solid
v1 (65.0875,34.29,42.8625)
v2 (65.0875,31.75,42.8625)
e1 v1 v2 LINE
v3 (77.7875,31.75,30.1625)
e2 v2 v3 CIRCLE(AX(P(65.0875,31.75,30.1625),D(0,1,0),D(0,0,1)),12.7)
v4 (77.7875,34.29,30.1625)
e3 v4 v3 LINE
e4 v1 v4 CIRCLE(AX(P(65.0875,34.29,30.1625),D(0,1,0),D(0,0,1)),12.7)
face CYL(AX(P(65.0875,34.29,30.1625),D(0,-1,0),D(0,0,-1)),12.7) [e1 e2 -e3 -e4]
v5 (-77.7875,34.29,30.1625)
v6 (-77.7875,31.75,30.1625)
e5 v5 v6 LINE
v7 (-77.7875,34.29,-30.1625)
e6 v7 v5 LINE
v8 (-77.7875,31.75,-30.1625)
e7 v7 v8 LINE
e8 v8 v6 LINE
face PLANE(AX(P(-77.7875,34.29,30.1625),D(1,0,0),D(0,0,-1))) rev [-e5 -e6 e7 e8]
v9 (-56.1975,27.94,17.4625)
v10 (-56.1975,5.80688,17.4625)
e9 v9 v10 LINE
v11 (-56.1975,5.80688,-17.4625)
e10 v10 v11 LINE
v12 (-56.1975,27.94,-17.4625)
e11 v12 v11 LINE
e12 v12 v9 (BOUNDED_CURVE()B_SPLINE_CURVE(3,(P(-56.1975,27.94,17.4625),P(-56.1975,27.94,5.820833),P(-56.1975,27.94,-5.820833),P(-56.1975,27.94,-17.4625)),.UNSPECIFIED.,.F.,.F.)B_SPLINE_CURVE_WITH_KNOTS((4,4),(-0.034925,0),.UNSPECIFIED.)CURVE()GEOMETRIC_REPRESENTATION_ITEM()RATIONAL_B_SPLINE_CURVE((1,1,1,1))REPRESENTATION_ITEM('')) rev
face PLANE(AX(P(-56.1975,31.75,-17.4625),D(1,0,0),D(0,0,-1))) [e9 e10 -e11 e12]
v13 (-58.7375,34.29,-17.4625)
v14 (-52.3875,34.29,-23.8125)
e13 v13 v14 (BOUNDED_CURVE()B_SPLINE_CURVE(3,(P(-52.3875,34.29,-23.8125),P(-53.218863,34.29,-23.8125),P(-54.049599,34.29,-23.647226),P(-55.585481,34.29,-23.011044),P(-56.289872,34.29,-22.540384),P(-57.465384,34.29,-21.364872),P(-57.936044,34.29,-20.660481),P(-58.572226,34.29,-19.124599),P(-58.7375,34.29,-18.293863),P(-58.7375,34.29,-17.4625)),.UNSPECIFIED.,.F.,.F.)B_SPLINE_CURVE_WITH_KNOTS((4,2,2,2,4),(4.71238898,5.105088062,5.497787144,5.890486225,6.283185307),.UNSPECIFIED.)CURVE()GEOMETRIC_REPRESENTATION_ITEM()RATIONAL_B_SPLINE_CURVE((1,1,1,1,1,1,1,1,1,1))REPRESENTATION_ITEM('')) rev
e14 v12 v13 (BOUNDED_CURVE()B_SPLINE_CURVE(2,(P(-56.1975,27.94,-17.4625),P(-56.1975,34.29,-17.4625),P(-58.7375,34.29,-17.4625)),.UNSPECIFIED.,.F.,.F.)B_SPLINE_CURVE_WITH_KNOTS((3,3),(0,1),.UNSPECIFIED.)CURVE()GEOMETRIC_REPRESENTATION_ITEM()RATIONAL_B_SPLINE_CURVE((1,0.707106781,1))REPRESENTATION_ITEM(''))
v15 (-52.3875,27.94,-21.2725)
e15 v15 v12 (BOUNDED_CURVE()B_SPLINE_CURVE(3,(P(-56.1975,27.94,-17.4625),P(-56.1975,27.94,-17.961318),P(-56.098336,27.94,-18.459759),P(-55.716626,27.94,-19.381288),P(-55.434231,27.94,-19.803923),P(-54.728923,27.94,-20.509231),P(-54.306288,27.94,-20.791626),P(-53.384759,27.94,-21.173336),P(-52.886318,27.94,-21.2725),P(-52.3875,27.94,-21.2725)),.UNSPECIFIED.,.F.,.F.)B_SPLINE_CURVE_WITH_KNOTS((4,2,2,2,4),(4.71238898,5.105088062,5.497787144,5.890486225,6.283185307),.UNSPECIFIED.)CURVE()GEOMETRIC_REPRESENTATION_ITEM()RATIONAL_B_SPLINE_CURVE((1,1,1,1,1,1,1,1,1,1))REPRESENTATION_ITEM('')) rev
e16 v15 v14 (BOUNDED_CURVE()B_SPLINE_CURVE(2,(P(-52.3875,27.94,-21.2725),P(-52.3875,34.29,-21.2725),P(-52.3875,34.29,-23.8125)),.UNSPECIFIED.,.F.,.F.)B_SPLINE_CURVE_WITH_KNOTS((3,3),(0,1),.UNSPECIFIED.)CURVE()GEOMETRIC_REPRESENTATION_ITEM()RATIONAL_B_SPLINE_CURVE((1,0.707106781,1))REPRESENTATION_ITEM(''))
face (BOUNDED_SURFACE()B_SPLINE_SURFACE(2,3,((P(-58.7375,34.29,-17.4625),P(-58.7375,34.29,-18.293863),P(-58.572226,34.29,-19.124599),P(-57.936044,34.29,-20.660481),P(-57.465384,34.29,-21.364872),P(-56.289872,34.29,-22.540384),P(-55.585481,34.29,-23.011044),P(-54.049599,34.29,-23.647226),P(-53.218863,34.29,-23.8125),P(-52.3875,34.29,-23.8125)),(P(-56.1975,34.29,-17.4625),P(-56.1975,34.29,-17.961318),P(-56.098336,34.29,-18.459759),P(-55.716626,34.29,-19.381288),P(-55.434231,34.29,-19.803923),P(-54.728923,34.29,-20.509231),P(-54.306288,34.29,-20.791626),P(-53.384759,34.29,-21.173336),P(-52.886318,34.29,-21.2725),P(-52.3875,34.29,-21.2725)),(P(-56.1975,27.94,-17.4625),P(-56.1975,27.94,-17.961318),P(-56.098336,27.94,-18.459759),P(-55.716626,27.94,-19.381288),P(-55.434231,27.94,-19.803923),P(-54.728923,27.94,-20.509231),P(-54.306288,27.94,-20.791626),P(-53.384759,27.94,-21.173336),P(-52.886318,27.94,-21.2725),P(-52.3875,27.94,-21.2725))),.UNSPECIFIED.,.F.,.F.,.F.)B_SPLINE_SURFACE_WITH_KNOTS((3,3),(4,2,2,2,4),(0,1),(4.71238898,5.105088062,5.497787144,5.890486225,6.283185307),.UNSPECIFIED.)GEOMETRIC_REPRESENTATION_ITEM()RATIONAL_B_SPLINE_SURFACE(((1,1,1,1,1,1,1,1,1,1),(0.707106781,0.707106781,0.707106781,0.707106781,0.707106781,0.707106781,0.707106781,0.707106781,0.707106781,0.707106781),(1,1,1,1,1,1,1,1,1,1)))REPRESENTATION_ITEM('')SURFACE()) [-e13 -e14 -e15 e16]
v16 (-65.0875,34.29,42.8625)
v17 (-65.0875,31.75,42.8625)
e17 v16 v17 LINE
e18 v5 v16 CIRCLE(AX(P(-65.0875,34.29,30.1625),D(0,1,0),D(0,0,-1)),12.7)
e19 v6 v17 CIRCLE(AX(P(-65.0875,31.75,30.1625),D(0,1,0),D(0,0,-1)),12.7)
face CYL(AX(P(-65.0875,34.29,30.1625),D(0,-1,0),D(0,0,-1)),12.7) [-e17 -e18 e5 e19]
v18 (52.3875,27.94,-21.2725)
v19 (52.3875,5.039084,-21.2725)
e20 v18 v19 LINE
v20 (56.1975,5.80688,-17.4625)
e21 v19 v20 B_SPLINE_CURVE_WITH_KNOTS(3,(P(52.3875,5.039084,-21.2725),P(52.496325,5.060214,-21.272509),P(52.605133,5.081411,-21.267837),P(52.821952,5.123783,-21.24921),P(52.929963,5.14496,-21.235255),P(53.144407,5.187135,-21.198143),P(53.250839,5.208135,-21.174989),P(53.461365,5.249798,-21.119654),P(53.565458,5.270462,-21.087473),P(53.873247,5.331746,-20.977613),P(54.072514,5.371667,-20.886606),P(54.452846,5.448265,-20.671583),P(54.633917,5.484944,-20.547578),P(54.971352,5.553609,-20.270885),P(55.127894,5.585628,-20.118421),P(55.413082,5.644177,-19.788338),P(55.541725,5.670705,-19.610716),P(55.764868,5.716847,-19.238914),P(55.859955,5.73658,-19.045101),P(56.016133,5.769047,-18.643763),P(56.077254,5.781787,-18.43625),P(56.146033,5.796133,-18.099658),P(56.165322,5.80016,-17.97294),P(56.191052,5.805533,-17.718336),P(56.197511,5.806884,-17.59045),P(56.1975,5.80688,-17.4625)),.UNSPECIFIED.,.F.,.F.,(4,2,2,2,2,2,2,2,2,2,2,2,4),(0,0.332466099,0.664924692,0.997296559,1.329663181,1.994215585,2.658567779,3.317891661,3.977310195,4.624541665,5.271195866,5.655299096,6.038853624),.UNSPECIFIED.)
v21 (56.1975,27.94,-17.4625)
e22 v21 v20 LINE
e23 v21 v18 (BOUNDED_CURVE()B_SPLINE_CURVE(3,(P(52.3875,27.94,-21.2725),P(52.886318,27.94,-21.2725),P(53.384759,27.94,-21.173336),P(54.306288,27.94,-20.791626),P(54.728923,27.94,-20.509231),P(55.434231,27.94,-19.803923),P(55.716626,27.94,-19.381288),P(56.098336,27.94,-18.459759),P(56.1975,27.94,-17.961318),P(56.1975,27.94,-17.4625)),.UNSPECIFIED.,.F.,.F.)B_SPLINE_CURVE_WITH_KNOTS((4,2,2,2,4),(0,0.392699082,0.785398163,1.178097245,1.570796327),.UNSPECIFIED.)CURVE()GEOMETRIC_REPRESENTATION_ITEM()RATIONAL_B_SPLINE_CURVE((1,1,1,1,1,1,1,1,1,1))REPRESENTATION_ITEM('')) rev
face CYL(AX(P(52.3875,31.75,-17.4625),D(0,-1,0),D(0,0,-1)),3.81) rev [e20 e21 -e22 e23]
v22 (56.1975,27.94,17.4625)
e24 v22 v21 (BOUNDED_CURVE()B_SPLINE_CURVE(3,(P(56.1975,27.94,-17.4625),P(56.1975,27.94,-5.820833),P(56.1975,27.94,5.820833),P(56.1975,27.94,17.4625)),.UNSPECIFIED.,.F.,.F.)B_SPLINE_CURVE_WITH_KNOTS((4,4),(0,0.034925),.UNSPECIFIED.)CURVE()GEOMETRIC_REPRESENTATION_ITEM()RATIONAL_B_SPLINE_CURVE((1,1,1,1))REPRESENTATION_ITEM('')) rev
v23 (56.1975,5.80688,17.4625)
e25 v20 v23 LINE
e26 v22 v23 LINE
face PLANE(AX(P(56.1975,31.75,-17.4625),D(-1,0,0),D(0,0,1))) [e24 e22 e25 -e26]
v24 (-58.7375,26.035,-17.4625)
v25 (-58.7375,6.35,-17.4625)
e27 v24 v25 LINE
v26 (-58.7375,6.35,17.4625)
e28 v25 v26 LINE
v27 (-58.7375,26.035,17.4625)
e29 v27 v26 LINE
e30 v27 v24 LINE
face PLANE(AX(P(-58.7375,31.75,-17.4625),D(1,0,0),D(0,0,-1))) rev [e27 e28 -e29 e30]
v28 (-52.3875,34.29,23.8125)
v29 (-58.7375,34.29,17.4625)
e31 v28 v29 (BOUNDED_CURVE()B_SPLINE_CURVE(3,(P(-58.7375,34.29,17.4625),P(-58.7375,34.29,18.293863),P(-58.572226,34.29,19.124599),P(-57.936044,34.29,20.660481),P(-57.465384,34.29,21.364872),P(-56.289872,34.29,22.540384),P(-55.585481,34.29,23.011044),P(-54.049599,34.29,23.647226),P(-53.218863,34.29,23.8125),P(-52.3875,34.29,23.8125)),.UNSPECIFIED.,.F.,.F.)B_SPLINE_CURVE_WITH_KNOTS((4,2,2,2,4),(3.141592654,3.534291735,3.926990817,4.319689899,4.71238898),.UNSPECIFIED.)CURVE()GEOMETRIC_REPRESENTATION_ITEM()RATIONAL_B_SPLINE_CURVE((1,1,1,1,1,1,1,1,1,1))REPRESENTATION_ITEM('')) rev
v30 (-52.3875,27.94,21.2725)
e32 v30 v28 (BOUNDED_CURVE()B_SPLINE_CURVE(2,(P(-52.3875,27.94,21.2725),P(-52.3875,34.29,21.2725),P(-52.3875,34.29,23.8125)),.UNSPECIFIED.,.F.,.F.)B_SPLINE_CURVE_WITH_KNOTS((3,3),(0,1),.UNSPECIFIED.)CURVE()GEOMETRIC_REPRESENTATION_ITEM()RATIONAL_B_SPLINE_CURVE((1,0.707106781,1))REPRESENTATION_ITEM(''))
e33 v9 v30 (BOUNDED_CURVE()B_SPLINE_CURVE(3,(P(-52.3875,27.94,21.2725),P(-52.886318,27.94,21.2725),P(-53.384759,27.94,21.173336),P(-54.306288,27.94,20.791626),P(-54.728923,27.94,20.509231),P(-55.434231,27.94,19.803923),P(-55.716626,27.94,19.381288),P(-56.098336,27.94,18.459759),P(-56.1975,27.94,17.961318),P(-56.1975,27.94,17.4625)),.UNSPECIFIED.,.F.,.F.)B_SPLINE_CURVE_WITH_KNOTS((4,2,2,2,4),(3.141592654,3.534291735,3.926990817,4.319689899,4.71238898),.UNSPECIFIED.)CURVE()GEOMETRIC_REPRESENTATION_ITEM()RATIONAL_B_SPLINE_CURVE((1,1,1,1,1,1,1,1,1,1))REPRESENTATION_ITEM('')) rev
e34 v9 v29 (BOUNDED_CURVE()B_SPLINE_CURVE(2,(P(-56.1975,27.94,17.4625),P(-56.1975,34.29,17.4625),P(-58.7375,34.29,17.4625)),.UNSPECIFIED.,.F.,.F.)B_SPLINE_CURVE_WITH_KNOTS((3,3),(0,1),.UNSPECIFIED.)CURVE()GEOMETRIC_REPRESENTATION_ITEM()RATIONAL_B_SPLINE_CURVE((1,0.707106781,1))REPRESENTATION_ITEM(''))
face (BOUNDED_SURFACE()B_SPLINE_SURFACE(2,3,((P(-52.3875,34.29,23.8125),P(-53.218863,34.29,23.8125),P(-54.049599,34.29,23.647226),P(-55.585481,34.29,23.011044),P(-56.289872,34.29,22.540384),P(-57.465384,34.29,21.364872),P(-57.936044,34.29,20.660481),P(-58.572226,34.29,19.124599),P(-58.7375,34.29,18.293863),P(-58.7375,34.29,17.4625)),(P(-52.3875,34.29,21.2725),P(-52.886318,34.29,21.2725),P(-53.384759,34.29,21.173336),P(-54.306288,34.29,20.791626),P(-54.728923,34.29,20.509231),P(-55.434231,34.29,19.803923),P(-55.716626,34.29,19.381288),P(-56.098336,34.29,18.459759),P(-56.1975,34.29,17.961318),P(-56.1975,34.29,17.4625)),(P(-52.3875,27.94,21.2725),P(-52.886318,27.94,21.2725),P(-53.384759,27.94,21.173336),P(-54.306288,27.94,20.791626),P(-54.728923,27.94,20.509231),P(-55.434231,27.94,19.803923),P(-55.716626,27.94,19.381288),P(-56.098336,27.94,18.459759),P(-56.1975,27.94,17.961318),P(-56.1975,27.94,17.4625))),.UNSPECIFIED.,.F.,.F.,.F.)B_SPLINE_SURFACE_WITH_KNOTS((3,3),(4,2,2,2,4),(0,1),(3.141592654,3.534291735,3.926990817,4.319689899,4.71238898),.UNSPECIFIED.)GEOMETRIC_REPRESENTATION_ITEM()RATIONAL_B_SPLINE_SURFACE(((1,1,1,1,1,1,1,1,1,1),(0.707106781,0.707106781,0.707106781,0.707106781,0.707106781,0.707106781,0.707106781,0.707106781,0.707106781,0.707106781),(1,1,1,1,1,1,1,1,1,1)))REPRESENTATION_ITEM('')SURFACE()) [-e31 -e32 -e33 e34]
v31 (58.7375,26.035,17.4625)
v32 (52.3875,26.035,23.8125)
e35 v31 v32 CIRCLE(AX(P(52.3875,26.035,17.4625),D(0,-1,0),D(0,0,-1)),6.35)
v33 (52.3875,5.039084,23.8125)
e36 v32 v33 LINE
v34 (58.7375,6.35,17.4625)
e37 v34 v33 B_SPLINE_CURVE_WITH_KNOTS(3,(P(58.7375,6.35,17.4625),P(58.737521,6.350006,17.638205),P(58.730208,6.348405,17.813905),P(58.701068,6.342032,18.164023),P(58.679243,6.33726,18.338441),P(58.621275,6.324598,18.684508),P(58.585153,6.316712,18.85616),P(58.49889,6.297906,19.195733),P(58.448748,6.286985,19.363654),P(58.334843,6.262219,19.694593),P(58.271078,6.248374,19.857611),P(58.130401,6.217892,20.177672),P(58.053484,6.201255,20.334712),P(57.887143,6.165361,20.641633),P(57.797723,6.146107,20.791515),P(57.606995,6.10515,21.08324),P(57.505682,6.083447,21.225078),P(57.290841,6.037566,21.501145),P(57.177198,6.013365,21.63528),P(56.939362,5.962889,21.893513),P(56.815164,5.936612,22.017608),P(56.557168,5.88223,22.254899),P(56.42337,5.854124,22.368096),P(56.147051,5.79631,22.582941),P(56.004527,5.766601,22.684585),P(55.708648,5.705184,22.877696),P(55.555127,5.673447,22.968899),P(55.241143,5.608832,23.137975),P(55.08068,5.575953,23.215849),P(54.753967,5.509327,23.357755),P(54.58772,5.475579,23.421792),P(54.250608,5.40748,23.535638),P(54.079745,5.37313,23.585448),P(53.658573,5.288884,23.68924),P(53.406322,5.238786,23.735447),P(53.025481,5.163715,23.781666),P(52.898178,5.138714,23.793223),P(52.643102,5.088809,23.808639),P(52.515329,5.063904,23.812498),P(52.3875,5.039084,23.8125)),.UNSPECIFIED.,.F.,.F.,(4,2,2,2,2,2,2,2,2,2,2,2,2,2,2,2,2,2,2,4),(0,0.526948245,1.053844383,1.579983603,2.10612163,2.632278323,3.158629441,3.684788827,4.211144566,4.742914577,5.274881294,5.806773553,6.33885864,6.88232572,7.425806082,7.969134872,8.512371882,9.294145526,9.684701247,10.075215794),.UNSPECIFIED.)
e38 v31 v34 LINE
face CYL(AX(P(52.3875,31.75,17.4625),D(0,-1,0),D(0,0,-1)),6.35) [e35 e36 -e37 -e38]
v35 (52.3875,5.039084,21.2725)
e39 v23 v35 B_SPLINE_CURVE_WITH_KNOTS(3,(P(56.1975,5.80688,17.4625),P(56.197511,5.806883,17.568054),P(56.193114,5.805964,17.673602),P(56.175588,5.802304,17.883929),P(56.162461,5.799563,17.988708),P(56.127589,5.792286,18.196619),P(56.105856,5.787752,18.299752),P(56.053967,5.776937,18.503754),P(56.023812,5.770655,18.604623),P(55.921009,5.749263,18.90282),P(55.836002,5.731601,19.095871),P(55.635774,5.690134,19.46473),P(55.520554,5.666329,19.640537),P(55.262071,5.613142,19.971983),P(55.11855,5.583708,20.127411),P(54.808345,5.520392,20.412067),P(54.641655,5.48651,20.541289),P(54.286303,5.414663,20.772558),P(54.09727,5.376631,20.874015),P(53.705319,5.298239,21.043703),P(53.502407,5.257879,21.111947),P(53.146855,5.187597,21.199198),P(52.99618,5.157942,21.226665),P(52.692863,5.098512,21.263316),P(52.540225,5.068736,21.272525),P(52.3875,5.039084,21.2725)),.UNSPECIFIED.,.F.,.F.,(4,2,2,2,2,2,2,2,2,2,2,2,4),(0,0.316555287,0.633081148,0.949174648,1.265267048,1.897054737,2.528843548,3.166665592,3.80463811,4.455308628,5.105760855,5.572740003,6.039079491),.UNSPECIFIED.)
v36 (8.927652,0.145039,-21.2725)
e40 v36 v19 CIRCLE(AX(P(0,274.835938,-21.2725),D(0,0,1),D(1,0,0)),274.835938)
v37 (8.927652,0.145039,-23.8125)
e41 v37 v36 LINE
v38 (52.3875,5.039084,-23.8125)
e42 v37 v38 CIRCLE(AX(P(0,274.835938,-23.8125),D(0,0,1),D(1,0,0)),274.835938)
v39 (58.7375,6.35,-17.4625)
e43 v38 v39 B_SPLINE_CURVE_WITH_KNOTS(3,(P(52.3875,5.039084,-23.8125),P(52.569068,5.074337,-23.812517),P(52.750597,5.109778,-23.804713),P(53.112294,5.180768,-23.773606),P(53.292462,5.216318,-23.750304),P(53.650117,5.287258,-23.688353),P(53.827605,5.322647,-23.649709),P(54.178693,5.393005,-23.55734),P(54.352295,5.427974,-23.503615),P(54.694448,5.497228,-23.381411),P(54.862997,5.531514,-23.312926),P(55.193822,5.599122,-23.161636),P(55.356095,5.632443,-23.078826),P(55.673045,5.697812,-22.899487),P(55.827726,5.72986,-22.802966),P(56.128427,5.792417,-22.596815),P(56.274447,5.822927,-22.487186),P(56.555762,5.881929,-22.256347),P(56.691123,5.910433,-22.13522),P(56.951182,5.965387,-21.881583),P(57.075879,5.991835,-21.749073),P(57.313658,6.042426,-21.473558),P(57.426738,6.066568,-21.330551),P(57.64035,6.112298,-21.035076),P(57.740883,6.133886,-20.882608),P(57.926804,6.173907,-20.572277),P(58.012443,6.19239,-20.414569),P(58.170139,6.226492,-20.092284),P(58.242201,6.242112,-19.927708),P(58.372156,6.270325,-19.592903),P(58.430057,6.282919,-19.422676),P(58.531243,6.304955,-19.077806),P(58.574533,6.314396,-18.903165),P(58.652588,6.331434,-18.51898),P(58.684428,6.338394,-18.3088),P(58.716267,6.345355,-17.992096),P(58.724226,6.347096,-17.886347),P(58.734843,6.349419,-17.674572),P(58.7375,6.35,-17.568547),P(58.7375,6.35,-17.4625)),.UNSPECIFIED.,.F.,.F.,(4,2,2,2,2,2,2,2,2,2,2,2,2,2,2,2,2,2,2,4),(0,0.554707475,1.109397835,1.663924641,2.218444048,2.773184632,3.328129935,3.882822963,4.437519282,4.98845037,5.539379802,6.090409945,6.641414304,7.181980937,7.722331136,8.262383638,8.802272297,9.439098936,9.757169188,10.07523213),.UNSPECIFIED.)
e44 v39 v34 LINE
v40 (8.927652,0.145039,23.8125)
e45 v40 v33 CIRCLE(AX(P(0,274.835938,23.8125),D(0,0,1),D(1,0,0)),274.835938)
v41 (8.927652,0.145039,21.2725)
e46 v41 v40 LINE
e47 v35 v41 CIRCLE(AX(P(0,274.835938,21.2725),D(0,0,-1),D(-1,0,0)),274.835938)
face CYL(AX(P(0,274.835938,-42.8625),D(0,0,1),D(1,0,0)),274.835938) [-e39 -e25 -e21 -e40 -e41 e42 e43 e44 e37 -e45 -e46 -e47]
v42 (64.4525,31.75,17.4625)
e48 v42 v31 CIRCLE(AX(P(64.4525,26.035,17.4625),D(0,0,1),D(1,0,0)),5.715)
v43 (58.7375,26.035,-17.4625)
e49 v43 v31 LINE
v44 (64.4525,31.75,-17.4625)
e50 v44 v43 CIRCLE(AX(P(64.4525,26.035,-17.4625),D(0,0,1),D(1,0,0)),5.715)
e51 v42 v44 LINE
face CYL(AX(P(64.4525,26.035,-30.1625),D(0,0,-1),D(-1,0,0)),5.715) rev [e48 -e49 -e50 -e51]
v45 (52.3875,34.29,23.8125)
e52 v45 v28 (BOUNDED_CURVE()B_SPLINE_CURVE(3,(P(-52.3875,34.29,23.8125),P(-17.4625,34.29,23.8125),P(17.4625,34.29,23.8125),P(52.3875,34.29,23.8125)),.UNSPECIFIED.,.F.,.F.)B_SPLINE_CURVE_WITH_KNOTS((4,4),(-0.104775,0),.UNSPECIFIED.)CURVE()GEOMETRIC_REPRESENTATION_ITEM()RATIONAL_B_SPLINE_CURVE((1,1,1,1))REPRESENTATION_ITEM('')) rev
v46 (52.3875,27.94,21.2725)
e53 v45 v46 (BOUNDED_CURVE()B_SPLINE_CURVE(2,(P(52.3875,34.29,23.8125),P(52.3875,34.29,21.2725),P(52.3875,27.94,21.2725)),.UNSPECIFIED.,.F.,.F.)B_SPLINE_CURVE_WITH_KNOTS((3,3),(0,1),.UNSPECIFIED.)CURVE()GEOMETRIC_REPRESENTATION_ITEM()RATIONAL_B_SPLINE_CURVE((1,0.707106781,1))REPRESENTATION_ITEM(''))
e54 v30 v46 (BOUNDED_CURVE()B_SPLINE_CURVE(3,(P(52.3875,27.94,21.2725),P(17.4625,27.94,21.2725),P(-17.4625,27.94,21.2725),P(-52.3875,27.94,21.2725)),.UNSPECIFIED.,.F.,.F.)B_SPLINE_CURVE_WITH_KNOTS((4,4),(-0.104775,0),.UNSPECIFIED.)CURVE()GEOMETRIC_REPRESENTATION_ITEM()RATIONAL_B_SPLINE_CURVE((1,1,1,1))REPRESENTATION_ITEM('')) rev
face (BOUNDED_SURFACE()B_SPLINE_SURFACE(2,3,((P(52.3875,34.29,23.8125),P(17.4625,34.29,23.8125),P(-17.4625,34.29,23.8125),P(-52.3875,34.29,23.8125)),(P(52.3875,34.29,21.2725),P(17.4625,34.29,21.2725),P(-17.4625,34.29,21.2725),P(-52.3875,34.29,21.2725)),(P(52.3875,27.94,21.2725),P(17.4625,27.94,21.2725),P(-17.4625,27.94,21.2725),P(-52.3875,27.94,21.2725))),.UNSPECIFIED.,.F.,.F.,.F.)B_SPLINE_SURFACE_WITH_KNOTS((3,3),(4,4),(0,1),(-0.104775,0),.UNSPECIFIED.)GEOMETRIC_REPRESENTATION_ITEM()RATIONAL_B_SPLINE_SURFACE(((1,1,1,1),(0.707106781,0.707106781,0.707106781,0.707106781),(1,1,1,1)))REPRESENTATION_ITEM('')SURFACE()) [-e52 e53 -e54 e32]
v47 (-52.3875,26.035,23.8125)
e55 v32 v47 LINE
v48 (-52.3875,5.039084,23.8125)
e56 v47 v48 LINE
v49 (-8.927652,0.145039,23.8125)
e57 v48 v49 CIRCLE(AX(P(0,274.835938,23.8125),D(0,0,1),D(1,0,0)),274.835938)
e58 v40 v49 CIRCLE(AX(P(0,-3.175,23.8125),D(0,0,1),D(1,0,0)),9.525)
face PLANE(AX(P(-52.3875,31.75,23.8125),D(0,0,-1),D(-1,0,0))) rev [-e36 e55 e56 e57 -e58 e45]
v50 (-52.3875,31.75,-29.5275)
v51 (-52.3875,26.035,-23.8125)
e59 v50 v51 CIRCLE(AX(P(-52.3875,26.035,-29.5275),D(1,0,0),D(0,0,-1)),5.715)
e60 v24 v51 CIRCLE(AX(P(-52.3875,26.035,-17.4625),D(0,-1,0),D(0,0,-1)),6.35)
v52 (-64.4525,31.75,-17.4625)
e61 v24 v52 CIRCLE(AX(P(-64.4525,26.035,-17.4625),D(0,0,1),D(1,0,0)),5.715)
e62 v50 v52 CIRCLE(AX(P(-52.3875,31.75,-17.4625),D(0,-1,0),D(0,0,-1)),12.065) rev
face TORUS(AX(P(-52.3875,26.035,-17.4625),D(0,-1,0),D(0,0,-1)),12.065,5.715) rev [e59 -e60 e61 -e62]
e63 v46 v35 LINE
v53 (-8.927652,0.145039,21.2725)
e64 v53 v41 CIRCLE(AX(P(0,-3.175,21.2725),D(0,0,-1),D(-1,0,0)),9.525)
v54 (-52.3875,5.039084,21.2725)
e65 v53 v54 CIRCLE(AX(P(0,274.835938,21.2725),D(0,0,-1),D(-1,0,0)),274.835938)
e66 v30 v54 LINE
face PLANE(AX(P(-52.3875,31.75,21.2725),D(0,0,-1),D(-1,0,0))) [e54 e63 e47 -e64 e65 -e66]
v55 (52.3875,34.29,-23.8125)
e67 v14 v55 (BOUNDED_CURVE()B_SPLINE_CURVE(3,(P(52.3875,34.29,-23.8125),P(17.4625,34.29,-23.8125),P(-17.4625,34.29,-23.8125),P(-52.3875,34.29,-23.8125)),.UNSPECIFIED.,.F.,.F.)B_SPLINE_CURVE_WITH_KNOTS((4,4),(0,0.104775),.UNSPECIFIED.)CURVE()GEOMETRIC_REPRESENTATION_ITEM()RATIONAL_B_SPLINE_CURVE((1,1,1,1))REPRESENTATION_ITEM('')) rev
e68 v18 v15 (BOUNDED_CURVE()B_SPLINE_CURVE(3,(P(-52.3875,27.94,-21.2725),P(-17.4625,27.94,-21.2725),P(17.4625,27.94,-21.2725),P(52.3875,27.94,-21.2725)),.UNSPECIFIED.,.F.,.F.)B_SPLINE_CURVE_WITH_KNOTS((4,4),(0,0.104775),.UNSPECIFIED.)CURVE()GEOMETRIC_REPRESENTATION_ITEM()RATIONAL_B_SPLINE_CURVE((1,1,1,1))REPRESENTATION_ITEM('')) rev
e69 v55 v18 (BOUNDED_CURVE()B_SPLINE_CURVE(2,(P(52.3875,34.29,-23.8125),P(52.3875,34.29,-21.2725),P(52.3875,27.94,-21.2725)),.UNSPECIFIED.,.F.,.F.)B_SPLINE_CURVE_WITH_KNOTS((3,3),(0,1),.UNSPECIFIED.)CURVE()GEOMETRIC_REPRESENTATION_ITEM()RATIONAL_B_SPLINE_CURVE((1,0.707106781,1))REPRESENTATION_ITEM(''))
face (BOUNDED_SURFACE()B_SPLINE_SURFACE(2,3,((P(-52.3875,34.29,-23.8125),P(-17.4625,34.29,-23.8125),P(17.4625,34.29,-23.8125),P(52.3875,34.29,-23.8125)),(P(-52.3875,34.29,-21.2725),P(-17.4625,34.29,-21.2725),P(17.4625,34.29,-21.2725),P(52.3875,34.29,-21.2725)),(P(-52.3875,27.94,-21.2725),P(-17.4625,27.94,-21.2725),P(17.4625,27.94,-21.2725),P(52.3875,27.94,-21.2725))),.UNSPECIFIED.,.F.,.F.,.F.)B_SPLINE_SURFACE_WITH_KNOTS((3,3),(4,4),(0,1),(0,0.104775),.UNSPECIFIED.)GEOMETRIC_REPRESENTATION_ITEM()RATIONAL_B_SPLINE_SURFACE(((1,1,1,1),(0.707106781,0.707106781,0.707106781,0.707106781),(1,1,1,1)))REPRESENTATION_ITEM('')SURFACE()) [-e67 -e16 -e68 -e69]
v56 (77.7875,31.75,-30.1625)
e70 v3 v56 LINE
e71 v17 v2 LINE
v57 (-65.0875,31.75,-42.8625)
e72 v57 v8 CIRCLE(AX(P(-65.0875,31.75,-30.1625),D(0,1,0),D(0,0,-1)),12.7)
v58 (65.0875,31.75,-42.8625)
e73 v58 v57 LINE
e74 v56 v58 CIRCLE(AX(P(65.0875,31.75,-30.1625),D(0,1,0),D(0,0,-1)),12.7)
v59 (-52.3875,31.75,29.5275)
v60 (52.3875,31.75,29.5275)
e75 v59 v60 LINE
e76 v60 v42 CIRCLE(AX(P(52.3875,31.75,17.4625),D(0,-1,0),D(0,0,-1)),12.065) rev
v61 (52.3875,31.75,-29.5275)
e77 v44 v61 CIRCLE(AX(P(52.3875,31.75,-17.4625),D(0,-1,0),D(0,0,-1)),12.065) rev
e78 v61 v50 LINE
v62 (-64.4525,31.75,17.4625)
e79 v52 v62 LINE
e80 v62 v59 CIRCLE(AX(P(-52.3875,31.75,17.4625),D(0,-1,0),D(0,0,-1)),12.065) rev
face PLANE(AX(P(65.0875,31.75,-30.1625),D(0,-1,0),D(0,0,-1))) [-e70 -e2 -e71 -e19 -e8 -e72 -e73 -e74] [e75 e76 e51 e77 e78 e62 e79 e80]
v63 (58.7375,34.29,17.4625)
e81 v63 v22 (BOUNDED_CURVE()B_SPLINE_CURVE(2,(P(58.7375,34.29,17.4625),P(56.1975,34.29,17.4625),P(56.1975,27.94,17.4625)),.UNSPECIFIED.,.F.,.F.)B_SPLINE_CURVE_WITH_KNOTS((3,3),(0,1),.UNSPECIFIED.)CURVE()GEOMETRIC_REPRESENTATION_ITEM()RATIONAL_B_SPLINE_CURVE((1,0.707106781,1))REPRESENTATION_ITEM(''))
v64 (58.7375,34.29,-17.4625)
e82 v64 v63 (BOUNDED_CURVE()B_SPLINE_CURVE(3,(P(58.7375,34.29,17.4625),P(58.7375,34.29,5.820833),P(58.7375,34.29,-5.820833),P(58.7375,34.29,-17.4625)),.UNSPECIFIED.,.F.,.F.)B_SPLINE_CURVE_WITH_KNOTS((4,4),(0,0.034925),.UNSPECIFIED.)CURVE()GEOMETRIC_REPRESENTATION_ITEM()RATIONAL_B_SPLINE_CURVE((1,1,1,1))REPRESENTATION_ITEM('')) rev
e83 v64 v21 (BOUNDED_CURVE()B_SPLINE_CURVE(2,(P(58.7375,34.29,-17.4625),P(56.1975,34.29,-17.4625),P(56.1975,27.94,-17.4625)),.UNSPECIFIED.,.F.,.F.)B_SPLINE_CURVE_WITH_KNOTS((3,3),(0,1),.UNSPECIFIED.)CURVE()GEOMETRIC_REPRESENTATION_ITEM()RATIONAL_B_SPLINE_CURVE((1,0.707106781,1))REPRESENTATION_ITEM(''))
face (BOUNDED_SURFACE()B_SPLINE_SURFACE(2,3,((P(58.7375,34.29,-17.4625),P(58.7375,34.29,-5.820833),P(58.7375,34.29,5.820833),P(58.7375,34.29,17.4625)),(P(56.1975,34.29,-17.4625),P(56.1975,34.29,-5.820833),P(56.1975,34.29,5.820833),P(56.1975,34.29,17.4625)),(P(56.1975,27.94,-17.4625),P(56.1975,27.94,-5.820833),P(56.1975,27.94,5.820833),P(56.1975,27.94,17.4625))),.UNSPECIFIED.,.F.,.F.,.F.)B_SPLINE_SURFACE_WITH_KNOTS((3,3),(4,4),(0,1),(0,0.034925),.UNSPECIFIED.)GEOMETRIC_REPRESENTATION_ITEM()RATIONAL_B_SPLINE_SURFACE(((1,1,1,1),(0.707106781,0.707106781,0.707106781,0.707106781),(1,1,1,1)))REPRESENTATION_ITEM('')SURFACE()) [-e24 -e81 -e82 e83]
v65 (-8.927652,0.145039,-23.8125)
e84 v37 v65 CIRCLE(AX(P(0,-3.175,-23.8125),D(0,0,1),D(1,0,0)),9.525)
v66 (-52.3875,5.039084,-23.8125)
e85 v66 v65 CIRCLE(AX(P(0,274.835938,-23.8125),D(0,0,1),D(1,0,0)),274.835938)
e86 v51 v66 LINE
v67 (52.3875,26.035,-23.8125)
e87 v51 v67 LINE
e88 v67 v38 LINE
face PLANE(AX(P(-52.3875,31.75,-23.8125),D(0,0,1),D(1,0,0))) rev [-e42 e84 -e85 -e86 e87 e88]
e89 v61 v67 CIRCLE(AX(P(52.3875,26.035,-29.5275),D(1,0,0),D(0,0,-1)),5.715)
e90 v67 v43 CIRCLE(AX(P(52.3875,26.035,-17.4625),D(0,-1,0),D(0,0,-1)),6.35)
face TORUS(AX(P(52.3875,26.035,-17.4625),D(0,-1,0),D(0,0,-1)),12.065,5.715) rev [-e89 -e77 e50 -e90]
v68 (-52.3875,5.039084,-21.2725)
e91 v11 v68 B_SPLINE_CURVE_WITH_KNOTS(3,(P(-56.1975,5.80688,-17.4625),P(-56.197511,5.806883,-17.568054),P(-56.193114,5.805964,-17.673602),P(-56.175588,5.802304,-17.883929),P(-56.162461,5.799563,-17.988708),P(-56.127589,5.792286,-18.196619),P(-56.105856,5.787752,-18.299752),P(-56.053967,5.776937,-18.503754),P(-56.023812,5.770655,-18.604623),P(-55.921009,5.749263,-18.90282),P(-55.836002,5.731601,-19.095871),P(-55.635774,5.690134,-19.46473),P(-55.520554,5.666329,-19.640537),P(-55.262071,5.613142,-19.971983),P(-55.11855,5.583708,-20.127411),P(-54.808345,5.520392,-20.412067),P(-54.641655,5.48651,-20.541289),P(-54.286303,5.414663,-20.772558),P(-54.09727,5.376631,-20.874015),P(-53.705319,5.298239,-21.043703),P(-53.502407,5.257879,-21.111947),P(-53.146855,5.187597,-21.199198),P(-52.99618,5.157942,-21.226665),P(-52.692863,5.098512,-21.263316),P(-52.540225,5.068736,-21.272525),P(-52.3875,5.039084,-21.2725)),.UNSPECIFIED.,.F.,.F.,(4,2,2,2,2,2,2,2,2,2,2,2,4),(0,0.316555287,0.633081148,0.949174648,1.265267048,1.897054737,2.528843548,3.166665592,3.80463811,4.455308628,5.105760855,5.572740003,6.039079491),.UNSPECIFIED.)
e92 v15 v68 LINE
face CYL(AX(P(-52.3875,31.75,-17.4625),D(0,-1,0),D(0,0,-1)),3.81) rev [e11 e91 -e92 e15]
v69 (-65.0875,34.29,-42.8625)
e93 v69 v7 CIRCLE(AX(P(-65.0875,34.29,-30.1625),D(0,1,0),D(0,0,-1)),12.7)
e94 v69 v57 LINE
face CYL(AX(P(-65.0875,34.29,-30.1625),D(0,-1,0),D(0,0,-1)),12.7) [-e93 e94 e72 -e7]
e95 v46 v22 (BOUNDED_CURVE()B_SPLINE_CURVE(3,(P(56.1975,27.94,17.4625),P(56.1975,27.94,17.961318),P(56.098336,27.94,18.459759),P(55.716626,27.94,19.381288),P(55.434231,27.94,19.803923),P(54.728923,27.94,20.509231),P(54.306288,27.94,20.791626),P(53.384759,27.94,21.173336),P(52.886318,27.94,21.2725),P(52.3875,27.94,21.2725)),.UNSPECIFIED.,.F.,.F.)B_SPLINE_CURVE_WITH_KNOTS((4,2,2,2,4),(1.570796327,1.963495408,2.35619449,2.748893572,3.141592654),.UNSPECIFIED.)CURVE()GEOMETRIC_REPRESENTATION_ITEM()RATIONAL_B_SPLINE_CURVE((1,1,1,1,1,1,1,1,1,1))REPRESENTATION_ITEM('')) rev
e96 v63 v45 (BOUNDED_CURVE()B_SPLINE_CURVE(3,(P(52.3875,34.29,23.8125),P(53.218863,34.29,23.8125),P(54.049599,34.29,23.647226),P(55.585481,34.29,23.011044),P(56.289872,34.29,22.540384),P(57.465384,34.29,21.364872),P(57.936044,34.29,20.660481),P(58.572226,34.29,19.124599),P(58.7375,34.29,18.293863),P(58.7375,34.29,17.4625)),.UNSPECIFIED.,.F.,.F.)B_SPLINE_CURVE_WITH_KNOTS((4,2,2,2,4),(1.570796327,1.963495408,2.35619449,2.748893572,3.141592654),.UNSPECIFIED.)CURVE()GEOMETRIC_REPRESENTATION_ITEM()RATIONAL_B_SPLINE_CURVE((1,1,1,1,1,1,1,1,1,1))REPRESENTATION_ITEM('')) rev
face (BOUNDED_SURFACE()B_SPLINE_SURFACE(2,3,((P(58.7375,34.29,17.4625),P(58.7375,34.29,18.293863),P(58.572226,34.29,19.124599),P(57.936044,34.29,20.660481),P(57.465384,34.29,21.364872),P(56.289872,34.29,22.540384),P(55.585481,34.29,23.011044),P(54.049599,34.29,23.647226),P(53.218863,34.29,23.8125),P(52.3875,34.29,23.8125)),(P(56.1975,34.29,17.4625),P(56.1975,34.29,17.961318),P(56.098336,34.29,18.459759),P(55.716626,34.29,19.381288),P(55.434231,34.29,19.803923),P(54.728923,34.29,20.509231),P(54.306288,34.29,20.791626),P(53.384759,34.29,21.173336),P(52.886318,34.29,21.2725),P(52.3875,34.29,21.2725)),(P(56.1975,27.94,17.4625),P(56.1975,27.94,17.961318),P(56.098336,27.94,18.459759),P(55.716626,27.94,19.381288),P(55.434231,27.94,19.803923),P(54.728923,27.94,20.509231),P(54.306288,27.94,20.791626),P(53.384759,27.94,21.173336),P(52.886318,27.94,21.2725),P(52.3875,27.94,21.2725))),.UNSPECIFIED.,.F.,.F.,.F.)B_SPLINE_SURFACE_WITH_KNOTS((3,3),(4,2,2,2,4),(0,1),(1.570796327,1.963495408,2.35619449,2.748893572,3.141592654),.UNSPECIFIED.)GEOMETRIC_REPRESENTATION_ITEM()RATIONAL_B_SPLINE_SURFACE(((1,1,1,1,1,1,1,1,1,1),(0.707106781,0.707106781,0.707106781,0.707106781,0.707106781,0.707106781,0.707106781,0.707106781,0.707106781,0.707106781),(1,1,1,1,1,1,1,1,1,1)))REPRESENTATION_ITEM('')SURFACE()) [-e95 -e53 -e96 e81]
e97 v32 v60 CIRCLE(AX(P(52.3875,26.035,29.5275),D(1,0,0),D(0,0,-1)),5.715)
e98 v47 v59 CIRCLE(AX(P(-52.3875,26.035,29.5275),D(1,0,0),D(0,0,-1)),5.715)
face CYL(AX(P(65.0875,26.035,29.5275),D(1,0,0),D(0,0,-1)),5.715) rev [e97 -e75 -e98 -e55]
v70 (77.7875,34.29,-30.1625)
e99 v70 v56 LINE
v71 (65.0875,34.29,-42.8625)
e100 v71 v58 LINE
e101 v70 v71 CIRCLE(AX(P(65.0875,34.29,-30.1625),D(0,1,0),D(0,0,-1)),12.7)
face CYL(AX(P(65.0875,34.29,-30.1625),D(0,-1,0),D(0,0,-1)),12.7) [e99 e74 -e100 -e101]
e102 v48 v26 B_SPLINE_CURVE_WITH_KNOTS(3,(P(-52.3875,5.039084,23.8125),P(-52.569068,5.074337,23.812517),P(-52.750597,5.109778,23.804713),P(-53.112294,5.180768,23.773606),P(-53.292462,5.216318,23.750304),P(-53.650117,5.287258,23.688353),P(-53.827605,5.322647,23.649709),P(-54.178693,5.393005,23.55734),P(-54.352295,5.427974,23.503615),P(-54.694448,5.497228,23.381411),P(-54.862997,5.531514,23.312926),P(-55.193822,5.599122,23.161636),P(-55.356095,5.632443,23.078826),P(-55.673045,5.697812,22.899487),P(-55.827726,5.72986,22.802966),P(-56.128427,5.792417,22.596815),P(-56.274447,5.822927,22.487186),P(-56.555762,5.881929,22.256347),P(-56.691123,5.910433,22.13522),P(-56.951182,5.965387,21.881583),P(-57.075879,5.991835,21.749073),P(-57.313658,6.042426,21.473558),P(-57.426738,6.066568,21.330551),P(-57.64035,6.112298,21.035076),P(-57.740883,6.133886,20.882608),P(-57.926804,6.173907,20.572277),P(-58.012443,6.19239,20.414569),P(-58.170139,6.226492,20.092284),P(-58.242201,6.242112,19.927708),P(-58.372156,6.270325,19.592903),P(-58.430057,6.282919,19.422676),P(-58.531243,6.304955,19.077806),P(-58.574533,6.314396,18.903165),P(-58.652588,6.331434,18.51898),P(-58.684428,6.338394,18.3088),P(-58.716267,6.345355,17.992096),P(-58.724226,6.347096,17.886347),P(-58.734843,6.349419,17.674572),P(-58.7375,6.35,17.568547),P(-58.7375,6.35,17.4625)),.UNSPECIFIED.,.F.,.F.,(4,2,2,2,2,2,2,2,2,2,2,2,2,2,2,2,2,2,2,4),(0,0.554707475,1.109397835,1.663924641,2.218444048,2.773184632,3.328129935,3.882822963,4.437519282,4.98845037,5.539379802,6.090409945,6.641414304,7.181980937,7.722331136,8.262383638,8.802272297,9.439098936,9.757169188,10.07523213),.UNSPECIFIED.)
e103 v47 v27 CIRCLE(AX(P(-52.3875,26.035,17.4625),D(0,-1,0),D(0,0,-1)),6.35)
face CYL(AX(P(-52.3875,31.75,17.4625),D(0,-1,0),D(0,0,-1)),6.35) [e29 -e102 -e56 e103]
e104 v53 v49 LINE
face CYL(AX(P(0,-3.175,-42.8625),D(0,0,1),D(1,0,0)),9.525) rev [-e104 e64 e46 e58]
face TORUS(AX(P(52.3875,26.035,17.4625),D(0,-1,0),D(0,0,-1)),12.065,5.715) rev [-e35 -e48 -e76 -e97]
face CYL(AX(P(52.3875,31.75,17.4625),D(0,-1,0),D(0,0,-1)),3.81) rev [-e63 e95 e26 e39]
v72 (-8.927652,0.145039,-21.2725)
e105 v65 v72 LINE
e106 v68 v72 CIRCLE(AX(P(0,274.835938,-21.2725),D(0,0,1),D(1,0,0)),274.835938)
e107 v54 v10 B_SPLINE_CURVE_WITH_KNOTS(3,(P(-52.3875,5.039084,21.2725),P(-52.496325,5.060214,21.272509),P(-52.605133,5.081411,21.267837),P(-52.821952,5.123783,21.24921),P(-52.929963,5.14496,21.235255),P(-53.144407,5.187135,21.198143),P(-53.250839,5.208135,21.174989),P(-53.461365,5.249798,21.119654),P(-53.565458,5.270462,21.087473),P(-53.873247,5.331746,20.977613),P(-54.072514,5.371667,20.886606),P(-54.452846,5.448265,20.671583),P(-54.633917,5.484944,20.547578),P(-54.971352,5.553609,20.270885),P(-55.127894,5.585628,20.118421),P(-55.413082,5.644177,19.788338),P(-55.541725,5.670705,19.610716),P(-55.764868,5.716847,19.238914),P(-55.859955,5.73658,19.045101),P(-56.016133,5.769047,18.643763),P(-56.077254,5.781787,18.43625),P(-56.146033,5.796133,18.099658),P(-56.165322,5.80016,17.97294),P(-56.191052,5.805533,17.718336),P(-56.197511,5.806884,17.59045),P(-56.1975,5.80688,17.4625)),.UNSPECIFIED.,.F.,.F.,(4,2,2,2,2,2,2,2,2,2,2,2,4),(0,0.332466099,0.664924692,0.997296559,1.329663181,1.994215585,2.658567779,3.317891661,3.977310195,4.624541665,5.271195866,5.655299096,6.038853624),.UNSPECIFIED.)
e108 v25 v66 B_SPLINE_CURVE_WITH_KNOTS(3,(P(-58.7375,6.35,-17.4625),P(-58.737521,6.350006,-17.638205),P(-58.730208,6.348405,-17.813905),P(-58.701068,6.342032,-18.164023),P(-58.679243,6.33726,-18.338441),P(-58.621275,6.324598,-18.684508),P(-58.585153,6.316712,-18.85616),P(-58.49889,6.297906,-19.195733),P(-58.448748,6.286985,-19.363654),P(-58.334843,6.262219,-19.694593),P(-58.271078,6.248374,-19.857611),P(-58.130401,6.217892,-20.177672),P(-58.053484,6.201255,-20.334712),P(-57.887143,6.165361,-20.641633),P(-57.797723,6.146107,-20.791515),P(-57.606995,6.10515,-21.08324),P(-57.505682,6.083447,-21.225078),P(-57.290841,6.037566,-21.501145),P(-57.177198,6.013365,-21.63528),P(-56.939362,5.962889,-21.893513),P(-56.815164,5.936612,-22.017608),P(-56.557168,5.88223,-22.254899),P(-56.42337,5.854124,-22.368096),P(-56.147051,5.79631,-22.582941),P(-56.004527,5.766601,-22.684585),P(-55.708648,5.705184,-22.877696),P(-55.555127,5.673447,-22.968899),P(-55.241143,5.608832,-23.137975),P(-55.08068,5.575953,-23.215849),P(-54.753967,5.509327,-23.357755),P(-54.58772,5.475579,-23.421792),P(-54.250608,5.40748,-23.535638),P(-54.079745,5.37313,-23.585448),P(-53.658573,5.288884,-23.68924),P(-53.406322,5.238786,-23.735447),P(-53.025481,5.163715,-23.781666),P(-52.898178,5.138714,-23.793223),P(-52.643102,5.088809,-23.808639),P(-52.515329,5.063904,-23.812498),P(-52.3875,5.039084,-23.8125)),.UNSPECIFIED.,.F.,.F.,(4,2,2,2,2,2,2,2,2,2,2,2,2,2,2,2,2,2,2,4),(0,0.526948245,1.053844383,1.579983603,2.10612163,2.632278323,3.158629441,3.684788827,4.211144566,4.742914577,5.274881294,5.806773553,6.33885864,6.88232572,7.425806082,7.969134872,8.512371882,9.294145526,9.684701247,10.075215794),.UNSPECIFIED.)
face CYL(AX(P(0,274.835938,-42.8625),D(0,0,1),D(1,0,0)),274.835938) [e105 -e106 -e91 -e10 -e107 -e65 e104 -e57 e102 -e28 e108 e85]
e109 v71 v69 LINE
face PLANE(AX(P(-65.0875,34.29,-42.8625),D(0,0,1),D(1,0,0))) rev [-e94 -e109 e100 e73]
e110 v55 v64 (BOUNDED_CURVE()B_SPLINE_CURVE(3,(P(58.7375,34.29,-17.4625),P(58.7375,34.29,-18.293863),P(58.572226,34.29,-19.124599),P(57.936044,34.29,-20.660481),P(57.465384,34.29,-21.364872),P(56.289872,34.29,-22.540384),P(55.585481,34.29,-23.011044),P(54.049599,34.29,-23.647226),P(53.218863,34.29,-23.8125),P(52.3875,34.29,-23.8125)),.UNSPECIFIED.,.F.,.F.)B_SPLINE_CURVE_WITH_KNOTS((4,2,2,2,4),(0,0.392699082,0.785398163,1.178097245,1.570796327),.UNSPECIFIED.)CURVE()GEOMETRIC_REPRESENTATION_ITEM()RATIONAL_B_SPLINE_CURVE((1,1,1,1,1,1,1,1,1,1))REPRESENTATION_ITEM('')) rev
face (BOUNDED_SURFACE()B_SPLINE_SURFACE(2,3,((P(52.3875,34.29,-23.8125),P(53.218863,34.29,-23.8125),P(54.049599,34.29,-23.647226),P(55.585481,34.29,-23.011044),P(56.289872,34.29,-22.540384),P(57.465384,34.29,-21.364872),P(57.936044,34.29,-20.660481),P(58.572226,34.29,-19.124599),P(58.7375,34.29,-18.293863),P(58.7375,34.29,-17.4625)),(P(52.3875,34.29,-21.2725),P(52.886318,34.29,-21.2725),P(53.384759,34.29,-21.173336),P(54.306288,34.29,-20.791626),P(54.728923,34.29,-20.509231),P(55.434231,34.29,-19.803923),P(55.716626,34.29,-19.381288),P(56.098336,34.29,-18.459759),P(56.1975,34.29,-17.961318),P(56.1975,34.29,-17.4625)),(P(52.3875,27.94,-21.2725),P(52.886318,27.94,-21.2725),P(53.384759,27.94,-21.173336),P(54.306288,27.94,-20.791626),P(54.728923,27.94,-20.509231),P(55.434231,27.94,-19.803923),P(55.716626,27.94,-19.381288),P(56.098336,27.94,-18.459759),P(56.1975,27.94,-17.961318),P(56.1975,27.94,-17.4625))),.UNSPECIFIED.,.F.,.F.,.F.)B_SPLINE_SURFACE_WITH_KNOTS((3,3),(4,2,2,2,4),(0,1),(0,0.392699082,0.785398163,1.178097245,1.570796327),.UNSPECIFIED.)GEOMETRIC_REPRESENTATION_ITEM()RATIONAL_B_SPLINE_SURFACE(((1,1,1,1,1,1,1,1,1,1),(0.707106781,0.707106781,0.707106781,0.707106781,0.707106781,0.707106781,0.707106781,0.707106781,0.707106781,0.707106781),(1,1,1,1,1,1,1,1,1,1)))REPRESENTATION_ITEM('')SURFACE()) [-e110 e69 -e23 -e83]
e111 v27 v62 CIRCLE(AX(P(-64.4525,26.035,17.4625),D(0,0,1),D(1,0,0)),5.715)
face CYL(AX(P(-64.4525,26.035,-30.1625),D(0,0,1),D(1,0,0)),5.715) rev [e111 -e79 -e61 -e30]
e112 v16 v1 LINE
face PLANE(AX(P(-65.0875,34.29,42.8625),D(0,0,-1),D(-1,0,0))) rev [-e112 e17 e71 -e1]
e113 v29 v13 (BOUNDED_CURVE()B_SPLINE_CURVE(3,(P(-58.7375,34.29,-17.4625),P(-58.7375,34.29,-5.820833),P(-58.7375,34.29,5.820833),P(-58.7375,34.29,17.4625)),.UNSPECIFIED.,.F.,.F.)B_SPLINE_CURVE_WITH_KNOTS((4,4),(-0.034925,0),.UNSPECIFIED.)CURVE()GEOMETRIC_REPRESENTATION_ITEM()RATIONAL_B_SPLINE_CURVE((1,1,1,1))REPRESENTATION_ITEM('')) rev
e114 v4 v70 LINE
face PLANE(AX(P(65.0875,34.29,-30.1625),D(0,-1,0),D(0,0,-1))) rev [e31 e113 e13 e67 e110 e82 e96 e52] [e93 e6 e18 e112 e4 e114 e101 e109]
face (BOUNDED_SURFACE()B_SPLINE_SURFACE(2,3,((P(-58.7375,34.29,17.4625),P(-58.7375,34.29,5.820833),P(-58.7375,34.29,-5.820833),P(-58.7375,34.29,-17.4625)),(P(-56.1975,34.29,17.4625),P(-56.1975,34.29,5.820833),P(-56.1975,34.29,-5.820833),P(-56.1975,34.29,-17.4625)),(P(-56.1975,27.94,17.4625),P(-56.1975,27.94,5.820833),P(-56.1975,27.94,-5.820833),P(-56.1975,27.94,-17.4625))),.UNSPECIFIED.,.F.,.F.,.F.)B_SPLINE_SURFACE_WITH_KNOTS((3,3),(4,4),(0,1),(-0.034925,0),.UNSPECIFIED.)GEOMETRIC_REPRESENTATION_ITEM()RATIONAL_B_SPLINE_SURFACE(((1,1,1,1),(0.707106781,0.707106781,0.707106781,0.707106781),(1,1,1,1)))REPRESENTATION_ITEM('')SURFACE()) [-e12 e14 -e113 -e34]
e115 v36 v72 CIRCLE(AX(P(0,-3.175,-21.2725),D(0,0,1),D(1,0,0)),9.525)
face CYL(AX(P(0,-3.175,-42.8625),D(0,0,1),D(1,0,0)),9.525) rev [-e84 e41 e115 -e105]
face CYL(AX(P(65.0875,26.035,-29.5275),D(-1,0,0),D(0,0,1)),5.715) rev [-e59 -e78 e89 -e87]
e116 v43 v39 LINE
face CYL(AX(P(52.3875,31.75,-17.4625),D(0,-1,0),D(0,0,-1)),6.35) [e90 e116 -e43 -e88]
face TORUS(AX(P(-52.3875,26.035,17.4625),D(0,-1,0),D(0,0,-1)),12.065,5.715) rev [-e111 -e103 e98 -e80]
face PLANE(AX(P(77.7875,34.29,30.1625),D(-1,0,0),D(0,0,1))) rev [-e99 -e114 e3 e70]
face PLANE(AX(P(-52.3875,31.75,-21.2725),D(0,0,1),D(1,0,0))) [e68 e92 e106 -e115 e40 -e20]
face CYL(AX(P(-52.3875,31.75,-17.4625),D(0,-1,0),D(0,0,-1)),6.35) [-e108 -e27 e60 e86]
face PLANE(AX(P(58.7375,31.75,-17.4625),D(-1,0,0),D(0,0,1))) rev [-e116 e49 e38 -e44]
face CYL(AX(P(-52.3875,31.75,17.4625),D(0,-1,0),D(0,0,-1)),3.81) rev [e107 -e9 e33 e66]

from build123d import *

# Parameters (mm, degrees)
BOSS_EXTRUDE1_DEPTH = 31.75
BOSS_EXTRUDE2_DEPTH = 2.54
FILLET1_R           = 5.715
FILLET3_SIZE        = 6.35
FILLET3_SIZE_2      = 2.54
CUT_EXTRUDE1_DEPTH  = 109.038210315


with BuildPart() as part:
    # Sketch1 → Boss-Extrude1 (new body)
    with BuildSketch(Plane(origin=(0, 0, 0), x_dir=(1, 0, 0), z_dir=(0, 1, 0))):
        with BuildLine():
            Line((-52.3875, 23.8125), (52.3875, 23.8125))
            ThreePointArc((52.3875, 23.8125), (56.877628061, 21.952628061), (58.7375, 17.4625))
            Line((58.7375, 17.4625), (58.7375, -17.4625))
            ThreePointArc((58.7375, -17.4625), (56.877628061, -21.952628061), (52.3875, -23.8125))
            Line((52.3875, -23.8125), (-52.3875, -23.8125))
            ThreePointArc((-52.3875, -23.8125), (-56.877628061, -21.952628061), (-58.7375, -17.4625))
            Line((-58.7375, -17.4625), (-58.7375, 17.4625))
            ThreePointArc((-58.7375, 17.4625), (-56.877628061, 21.952628061), (-52.3875, 23.8125))
        make_face()
        with BuildLine():
            Line((-56.1975, 17.4625), (-56.1975, -17.4625))
            ThreePointArc((-56.1975, -17.4625), (-55.081576836, -20.156576836), (-52.3875, -21.2725))
            Line((-52.3875, -21.2725), (52.3875, -21.2725))
            ThreePointArc((52.3875, -21.2725), (55.081576836, -20.156576836), (56.1975, -17.4625))
            Line((56.1975, -17.4625), (56.1975, 17.4625))
            ThreePointArc((56.1975, 17.4625), (55.081576836, 20.156576836), (52.3875, 21.2725))
            Line((52.3875, 21.2725), (-52.3875, 21.2725))
            ThreePointArc((-52.3875, 21.2725), (-55.081576836, 20.156576836), (-56.1975, 17.4625))
        make_face(mode=Mode.SUBTRACT)
    extrude(amount=BOSS_EXTRUDE1_DEPTH)

    # Sketch2 → Boss-Extrude2 (add)
    with BuildSketch(Plane(origin=(0, 31.75, 0), x_dir=(1, 0, 0), z_dir=(0, 1, 0))):
        with BuildLine():
            Line((-65.0875, -42.8625), (65.0875, -42.8625))
            ThreePointArc((65.0875, -42.8625), (74.067756121, -39.142756121), (77.7875, -30.1625))
            Line((77.7875, -30.1625), (77.7875, 30.1625))
            ThreePointArc((77.7875, 30.1625), (74.067756121, 39.142756121), (65.0875, 42.8625))
            Line((65.0875, 42.8625), (-65.0875, 42.8625))
            ThreePointArc((-65.0875, 42.8625), (-74.067756121, 39.142756121), (-77.7875, 30.1625))
            Line((-77.7875, 30.1625), (-77.7875, -30.1625))
            ThreePointArc((-77.7875, -30.1625), (-74.067756121, -39.142756121), (-65.0875, -42.8625))
        make_face()
        with BuildLine():
            Line((52.3875, 21.2725), (-52.3875, 21.2725))
            ThreePointArc((-52.3875, 21.2725), (-55.081576836, 20.156576836), (-56.1975, 17.4625))
            Line((-56.1975, 17.4625), (-56.1975, -17.4625))
            ThreePointArc((-56.1975, -17.4625), (-55.081576836, -20.156576836), (-52.3875, -21.2725))
            Line((-52.3875, -21.2725), (52.3875, -21.2725))
            ThreePointArc((52.3875, -21.2725), (55.081576836, -20.156576836), (56.1975, -17.4625))
            Line((56.1975, -17.4625), (56.1975, 17.4625))
            ThreePointArc((56.1975, 17.4625), (55.081576836, 20.156576836), (52.3875, 21.2725))
        make_face(mode=Mode.SUBTRACT)
    extrude(amount=BOSS_EXTRUDE2_DEPTH)

    # Fillet1
    fillet1_edges = [part.edges().sort_by_distance(p)[0] for p in [
        (-56.877628061, 31.75, -21.952628061),
        (-58.7375, 31.75, 0),
        (-56.877628061, 31.75, 21.952628061),
        (0, 31.75, 23.8125),
        (56.877628061, 31.75, 21.952628061),
        (58.7375, 31.75, 0),
        (56.877628061, 31.75, -21.952628061),
        (0, 31.75, -23.8125),
    ]]
    fillet(fillet1_edges, radius=FILLET1_R)

    # Fillet3
    # an asymmetric fillet: 6.35, 2.54 mm, written as the material it takes off along each edge
    with BuildSketch(Plane(origin=(-52.3875, 34.29, 21.2725), x_dir=(0, -1, 0), z_dir=(1, 0, 0)), Plane(origin=(52.3875, 34.29, -21.2725), x_dir=(0, -1, 0), z_dir=(-1, 0, 0))) as fillet3_piece_1:
        with BuildLine():
            Bezier((FILLET3_SIZE, 0), (0, 0), (0, -FILLET3_SIZE_2), weights=[1, 0.707106781, 1])
            Line((0, -FILLET3_SIZE_2), (0, 0))
            Line((0, 0), (FILLET3_SIZE, 0))
        make_face()
    extrude(amount=104.775, mode=Mode.SUBTRACT)
    with BuildSketch(Plane(origin=(52.3875, 34.29, 17.4625), x_dir=(0, 0, 1), z_dir=(-1, 0, 0))) as fillet3_piece_2:
        with BuildLine():
            Bezier((3.81, -FILLET3_SIZE), (3.81, 0), (3.81 + FILLET3_SIZE_2, 0), weights=[1, 0.707106781, 1])
            Line((3.81 + FILLET3_SIZE_2, 0), (3.81, 0))
            Line((3.81, 0), (3.81, -FILLET3_SIZE))
        make_face()
    revolve(axis=Axis((52.3875, 34.29, 17.4625), (0, 1, 0)), revolution_arc=90, mode=Mode.SUBTRACT)
    with BuildSketch(Plane(origin=(-52.3875, 34.29, 17.4625), x_dir=(-1, 0, 0), z_dir=(0, 0, -1))) as fillet3_piece_3:
        with BuildLine():
            Bezier((3.81, -FILLET3_SIZE), (3.81, 0), (3.81 + FILLET3_SIZE_2, 0), weights=[1, 0.707106781, 1])
            Line((3.81 + FILLET3_SIZE_2, 0), (3.81, 0))
            Line((3.81, 0), (3.81, -FILLET3_SIZE))
        make_face()
    revolve(axis=Axis((-52.3875, 34.29, 17.4625), (0, 1, 0)), revolution_arc=90, mode=Mode.SUBTRACT)
    with BuildSketch(Plane(origin=(56.1975, 34.29, 17.4625), x_dir=(0, -1, 0), z_dir=(0, 0, -1)), Plane(origin=(-56.1975, 34.29, -17.4625), x_dir=(0, -1, 0), z_dir=(0, 0, 1))) as fillet3_piece_4:
        with BuildLine():
            Bezier((FILLET3_SIZE, 0), (0, 0), (0, -FILLET3_SIZE_2), weights=[1, 0.707106781, 1])
            Line((0, -FILLET3_SIZE_2), (0, 0))
            Line((0, 0), (FILLET3_SIZE, 0))
        make_face()
    extrude(amount=34.925, mode=Mode.SUBTRACT)
    with BuildSketch(Plane(origin=(52.3875, 34.29, -17.4625), x_dir=(1, 0, 0), z_dir=(0, 0, 1))) as fillet3_piece_5:
        with BuildLine():
            Bezier((3.81, -FILLET3_SIZE), (3.81, 0), (3.81 + FILLET3_SIZE_2, 0), weights=[1, 0.707106781, 1])
            Line((3.81 + FILLET3_SIZE_2, 0), (3.81, 0))
            Line((3.81, 0), (3.81, -FILLET3_SIZE))
        make_face()
    revolve(axis=Axis((52.3875, 34.29, -17.4625), (0, 1, 0)), revolution_arc=90, mode=Mode.SUBTRACT)
    with BuildSketch(Plane(origin=(-52.3875, 34.29, -17.4625), x_dir=(0, 0, -1), z_dir=(1, 0, 0))) as fillet3_piece_6:
        with BuildLine():
            Bezier((3.81, -FILLET3_SIZE), (3.81, 0), (3.81 + FILLET3_SIZE_2, 0), weights=[1, 0.707106781, 1])
            Line((3.81 + FILLET3_SIZE_2, 0), (3.81, 0))
            Line((3.81, 0), (3.81, -FILLET3_SIZE))
        make_face()
    revolve(axis=Axis((-52.3875, 34.29, -17.4625), (0, 1, 0)), revolution_arc=90, mode=Mode.SUBTRACT)

    # Sketch3 → Cut-Extrude1 (cut, through all)
    with BuildSketch(Plane.XY.offset(23.8125)):
        with BuildLine():
            Line((-52.3875, 0), (-52.3875, 5.03908358))
            ThreePointArc((-52.3875, 5.03908358), (-55.566366011, 5.675815064), (-58.7375, 6.35))
            Line((-58.7375, 6.35), (-58.7375, 0))
            Line((-58.7375, 0), (-52.3875, 0))
        make_face()
        with BuildLine():
            ThreePointArc((-8.980256121, 0), (-8.954247565, 0.07262614), (-8.927651669, 0.145039258))
            ThreePointArc((-8.927651669, 0.145039258), (-30.755078825, 1.726220229), (-52.3875, 5.03908358))
            Line((-52.3875, 5.03908358), (-52.3875, 0))
            Line((-52.3875, 0), (-8.980256121, 0))
        make_face()
        with BuildLine():
            ThreePointArc((-1.188e-06, 0), (4.464414281, 0.036262197), (8.927651669, 0.145039258))
            ThreePointArc((8.927651669, 0.145039258), (0, 6.35), (-8.927651669, 0.145039258))
            ThreePointArc((-8.927651669, 0.145039258), (-4.464415469, 0.036262216), (-1.188e-06, 0))
        make_face()
        with BuildLine():
            ThreePointArc((8.980256121, 0), (8.954247565, 0.07262614), (8.927651669, 0.145039258))
            ThreePointArc((8.927651669, 0.145039258), (4.464414281, 0.036262197), (-1.188e-06, 0))
            Line((-1.188e-06, 0), (8.980256121, 0))
        make_face()
        with BuildLine():
            ThreePointArc((-1.188e-06, 0), (-4.464415469, 0.036262216), (-8.927651669, 0.145039258))
            ThreePointArc((-8.927651669, 0.145039258), (-8.954247565, 0.07262614), (-8.980256121, 0))
            Line((-8.980256121, 0), (-1.188e-06, 0))
        make_face()
        with BuildLine():
            Line((52.3875, 0), (52.3875, 5.03908358))
            ThreePointArc((52.3875, 5.03908358), (30.755078825, 1.726220229), (8.927651669, 0.145039258))
            ThreePointArc((8.927651669, 0.145039258), (8.954247565, 0.07262614), (8.980256121, 0))
            Line((8.980256121, 0), (52.3875, 0))
        make_face()
        with BuildLine():
            Line((58.7375, 0), (58.7375, 6.35))
            ThreePointArc((58.7375, 6.35), (55.566366011, 5.675815064), (52.3875, 5.03908358))
            Line((52.3875, 5.03908358), (52.3875, 0))
            Line((52.3875, 0), (58.7375, 0))
        make_face()
    extrude(amount=-CUT_EXTRUDE1_DEPTH, mode=Mode.SUBTRACT)


solid = part.part
